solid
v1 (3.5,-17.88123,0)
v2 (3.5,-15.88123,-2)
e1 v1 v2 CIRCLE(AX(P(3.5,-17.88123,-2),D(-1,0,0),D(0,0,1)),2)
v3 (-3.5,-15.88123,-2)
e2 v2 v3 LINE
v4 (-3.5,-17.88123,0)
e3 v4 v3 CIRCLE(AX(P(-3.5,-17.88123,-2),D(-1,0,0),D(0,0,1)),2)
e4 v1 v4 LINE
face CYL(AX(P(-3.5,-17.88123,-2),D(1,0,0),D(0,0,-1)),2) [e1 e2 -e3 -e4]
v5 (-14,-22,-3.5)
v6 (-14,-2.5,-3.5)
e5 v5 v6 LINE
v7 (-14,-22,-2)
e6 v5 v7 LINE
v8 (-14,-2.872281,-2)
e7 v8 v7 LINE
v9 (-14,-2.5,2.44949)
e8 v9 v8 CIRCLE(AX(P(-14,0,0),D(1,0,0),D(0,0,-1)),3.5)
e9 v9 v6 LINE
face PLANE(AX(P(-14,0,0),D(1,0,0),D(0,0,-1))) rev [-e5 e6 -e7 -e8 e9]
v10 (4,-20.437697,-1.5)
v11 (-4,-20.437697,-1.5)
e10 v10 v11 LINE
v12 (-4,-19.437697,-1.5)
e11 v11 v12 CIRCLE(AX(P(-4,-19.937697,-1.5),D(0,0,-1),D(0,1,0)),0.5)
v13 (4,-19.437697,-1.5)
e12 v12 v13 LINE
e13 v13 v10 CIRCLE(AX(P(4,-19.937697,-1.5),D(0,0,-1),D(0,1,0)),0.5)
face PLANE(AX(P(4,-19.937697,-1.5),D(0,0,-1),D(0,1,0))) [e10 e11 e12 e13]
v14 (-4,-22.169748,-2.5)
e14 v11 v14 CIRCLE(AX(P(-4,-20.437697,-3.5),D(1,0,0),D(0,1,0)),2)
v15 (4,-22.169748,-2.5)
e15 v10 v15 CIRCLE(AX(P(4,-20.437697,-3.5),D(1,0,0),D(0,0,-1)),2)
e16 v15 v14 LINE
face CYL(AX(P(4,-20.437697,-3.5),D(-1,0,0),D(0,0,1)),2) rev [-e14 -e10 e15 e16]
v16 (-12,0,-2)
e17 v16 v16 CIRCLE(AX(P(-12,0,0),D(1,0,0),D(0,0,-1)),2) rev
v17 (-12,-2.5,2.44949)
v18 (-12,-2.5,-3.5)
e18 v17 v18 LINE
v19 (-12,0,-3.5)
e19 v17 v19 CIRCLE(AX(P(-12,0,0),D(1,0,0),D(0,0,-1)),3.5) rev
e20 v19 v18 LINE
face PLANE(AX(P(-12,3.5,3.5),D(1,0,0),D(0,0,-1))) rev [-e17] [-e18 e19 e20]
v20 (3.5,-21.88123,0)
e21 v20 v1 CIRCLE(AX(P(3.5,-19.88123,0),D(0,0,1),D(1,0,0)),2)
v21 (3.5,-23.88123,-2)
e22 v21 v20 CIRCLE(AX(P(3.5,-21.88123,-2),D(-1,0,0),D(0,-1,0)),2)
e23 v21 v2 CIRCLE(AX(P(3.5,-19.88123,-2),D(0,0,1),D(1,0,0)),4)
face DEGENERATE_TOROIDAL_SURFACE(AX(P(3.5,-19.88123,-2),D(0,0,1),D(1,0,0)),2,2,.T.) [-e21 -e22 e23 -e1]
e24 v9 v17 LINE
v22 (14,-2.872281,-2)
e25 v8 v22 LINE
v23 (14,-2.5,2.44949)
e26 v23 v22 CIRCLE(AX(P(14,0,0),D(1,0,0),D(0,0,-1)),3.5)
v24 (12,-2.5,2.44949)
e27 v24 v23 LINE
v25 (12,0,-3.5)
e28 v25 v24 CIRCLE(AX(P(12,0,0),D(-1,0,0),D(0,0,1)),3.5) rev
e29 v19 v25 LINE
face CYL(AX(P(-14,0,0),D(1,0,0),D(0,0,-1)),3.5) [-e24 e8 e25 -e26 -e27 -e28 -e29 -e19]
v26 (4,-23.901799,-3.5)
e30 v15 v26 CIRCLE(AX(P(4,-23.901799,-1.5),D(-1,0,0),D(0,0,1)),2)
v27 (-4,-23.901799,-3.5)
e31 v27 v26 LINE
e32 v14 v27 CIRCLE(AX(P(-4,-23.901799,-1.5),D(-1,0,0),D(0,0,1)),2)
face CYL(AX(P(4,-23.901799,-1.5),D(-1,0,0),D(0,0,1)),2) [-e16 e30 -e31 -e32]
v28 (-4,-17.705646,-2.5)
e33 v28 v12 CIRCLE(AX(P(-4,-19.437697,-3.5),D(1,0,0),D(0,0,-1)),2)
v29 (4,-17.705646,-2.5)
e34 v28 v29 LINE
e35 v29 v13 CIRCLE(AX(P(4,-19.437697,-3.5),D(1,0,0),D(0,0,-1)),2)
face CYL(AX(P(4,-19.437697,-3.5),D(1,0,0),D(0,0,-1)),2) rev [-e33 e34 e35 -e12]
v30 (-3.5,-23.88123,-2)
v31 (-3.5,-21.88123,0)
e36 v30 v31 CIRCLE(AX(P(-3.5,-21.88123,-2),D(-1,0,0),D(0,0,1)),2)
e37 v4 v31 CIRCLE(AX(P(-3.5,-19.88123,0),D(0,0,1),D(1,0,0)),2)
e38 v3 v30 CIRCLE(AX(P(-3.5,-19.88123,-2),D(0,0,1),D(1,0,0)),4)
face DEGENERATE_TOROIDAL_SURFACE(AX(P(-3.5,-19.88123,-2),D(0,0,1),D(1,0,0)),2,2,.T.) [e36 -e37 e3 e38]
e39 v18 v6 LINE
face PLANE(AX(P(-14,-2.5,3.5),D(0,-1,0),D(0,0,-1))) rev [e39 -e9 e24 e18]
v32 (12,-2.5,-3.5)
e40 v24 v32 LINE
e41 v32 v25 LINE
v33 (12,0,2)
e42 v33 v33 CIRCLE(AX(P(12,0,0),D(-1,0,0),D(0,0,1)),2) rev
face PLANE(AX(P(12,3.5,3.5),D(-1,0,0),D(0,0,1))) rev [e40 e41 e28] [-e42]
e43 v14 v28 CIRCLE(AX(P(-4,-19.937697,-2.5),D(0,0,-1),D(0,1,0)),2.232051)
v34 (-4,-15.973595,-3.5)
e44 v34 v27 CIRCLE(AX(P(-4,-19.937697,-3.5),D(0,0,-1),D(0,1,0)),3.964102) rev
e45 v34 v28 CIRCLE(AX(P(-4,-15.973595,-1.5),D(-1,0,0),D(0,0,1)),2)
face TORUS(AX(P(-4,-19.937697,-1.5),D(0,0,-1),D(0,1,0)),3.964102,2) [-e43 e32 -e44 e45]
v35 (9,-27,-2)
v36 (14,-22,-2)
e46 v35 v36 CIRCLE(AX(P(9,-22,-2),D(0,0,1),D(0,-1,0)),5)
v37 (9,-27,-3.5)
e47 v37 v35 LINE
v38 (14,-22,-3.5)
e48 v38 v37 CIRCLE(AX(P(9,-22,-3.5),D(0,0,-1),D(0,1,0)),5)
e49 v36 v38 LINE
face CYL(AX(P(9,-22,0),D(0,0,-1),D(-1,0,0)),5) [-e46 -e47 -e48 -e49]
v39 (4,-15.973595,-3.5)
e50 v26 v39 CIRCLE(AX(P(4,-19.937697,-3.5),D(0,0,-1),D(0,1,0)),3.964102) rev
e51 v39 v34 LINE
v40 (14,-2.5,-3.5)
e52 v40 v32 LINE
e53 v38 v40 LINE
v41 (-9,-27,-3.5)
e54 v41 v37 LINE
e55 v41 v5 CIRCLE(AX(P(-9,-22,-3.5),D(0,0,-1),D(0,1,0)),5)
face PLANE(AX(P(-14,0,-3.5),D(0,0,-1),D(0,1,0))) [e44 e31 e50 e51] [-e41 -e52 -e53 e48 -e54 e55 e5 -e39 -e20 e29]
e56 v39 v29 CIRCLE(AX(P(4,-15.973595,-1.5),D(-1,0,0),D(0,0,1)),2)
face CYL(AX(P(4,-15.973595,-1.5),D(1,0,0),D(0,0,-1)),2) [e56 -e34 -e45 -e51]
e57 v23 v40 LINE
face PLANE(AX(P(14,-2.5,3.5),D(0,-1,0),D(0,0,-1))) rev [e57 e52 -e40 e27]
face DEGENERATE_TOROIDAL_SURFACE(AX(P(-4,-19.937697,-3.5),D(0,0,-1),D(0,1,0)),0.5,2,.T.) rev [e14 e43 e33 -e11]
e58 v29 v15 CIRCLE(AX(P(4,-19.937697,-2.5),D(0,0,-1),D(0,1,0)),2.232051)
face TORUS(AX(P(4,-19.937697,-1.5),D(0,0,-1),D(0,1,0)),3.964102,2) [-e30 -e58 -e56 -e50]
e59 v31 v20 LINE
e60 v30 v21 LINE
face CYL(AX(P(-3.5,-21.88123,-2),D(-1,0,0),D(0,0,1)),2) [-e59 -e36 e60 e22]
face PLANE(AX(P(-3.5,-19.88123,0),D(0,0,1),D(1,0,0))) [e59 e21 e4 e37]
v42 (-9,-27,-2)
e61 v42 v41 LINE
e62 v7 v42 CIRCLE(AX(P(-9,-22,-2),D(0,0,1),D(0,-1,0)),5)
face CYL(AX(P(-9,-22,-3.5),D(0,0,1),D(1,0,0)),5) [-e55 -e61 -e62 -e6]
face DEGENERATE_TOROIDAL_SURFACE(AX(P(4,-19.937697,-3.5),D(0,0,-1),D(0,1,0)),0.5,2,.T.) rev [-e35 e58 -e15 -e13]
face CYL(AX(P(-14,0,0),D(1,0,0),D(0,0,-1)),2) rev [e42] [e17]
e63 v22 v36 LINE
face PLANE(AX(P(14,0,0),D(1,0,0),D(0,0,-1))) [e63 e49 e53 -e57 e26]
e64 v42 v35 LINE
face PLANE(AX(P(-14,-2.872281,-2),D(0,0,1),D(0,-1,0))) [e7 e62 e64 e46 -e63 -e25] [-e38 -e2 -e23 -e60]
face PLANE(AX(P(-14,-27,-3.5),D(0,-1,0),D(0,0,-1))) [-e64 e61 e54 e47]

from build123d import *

# Parameters (mm, degrees)
BOSS_EXTRUDE1_DEPTH      = 14
BOSS_EXTRUDE1_DEPTH_BACK = 14
SKETCH1_R                = 2
FILLET1_R                = 5
BOSS_EXTRUDE2_DEPTH      = 2
FILLET2_R                = 2
CUT_EXTRUDE1_DEPTH       = 2
FILLET3_R                = 2
FILLET4_R                = 2
SKETCH4_W                = 2
SKETCH4_H                = 6
CUT_EXTRUDE2_DEPTH       = 32.208973069


# Some blends are built 0.0001 mm under size
with BuildPart() as part:
    # Sketch1 → Boss-Extrude1 (new, two sides: drawn at the far end of the back side and taken through both)
    with BuildSketch(Plane(origin=(0, 0, 0), x_dir=(0, 0, -1), z_dir=(1, 0, 0)).offset(-BOSS_EXTRUDE1_DEPTH_BACK)):
        with BuildLine():
            Line((3.5, 0), (3.5, -27))
            Line((3.5, -27), (2, -27))
            Line((2, -27), (2, -2.872281323))
            ThreePointArc((2, -2.872281323), (-3.102418411, 1.620185175), (3.5, 0))
        make_face()
        Circle(SKETCH1_R, mode=Mode.SUBTRACT)
    extrude(amount=BOSS_EXTRUDE1_DEPTH + BOSS_EXTRUDE1_DEPTH_BACK)

    # Fillet1
    fillet1_edges = [part.edges().sort_by_distance(p)[0] for p in [
        (-14, -27, -2.75),
        (14, -27, -2.75),
    ]]
    fillet(fillet1_edges, radius=FILLET1_R)

    # Sketch2 → Boss-Extrude2 (add)
    with BuildSketch(Plane.XY.offset(-2)):
        with BuildLine():
            Line((-3.5, -15.881230087), (3.5, -15.881230087))
            ThreePointArc((3.5, -15.881230087), (7.5, -19.881230087), (3.5, -23.881230087))
            Line((3.5, -23.881230087), (-3.5, -23.881230087))
            ThreePointArc((-3.5, -23.881230087), (-7.5, -19.881230087), (-3.5, -15.881230087))
        make_face()
    extrude(amount=BOSS_EXTRUDE2_DEPTH)

    # Fillet2
    fillet2_edges = [part.edges().sort_by_distance(p)[0] for p in [
        (-7.5, -19.881230087, 0),
        (0, -15.881230087, 0),
        (7.5, -19.881230087, 0),
        (0, -23.881230087, 0),
    ]]
    fillet(fillet2_edges, radius=FILLET2_R - 0.0001)  # a hair under: the kernel refuses the full size

    # Sketch3 → Cut-Extrude1 (cut)
    with BuildSketch(Plane(origin=(0, 0, -3.5), x_dir=(-1, 0, 0), z_dir=(0, 0, -1))):
        with BuildLine():
            Line((-4, -17.437696963), (4, -17.437696963))
            ThreePointArc((4, -17.437696963), (6.5, -19.937696963), (4, -22.437696963))
            Line((4, -22.437696963), (-4, -22.437696963))
            ThreePointArc((-4, -22.437696963), (-6.5, -19.937696963), (-4, -17.437696963))
        make_face()
    extrude(amount=-CUT_EXTRUDE1_DEPTH, mode=Mode.SUBTRACT)

    # Fillet3
    fillet3_edges = [part.edges().sort_by_distance(p)[0] for p in [
        (-6.5, -19.937696963, -1.5),
        (0, -22.437696963, -1.5),
        (6.5, -19.937696963, -1.5),
        (0, -17.437696963, -1.5),
    ]]
    fillet(fillet3_edges, radius=FILLET3_R - 0.0001)  # a hair under: the kernel refuses the full size

    # Fillet4
    # the kernel refuses this fillet: 2 mm, written as the material it takes off along each edge
    with BuildSketch(Plane(origin=(4, -19.937696963, -3.5), x_dir=(0, -1, 0), z_dir=(-1, 0, 0))) as fillet4_piece_1:
        with BuildLine():
            CenterArc((3.96414388, 2), FILLET4_R, 209.999172989, 60.000827011)
            Line((3.96414388, 0), (3.96414388, -0.2))
            Line((3.96414388, -0.2), (2.5, -0.2))
            Line((2.5, -0.2), (2.3, 0))
            ThreePointArc((2.3, 0), (2.3, 0.0001), (2.058872114, 0.900027501))
            Line((2.058872114, 0.900027501), (2.232078638, 1.000025001))
        make_face()
    revolve(axis=Axis((4, -19.937696963, -3.5), (0, 0, 1)), revolution_arc=180, mode=Mode.SUBTRACT)
    with BuildSketch(Plane(origin=(-4, -22.437696963, -3.5), x_dir=(0, 0.2587879267537998, 0.9659341638882383), z_dir=(1, 0, 0))) as fillet4_piece_2:
        with BuildLine():
            CenterArc((1.552965569, 1.931842448), FILLET4_R, 194.998154162, 60.000827011)
            Line((-0.378902759, 1.414266594), (-0.572089592, 1.362509009))
            Line((-0.572089592, 1.362509009), (-0.193186833, -0.051757585))
            Line((-0.193186833, -0.051757585), (0.051757585, -0.193186833))
            ThreePointArc((0.051757585, -0.193186833), (0.051854179, -0.193160954), (0.983525882, -0.193184245))
            Line((0.983525882, -0.193184245), (1.035293127, 0))
        make_face()
    extrude(amount=8, mode=Mode.SUBTRACT)
    with BuildSketch(Plane(origin=(-4, -19.937696963, -3.5), x_dir=(0, 1, 0), z_dir=(1, 0, 0))) as fillet4_piece_3:
        with BuildLine():
            CenterArc((3.96414388, 2), FILLET4_R, 209.999172989, 60.000827011)
            Line((2.232078638, 1.000025001), (2.058872114, 0.900027501))
            ThreePointArc((2.058872114, 0.900027501), (2.3, 0.0001), (2.3, 0))
            Line((2.3, 0), (2.5, -0.2))
            Line((2.5, -0.2), (3.96414388, -0.2))
            Line((3.96414388, -0.2), (3.96414388, 0))
        make_face()
    revolve(axis=Axis((-4, -19.937696963, -3.5), (0, 0, 1)), revolution_arc=180, mode=Mode.SUBTRACT)
    with BuildSketch(Plane(origin=(4, -17.437696963, -3.5), x_dir=(0, 1, 0), z_dir=(-1, 0, 0))) as fillet4_piece_4:
        with BuildLine():
            CenterArc((1.46414388, -2), FILLET4_R, 90, 60.000827011)
            Line((-0.267921362, -1.000025001), (-0.441127886, -0.900027501))
            ThreePointArc((-0.441127886, -0.900027501), (-0.2, -0.0001), (-0.2, 0))
            Line((-0.2, 0), (0, 0.2))
            Line((0, 0.2), (1.46414388, 0.2))
            Line((1.46414388, 0.2), (1.46414388, 0))
        make_face()
    extrude(amount=8, mode=Mode.SUBTRACT)

    # Sketch4 → Cut-Extrude2 (cut, through all)
    with BuildSketch(Plane(origin=(0, 0, -3.5), x_dir=(-1, 0, 0), z_dir=(0, 0, -1))):
        with Locations((-13, 0.5)):
            Rectangle(SKETCH4_W, SKETCH4_H)
        with Locations((13, 0.5)):
            Rectangle(SKETCH4_W, SKETCH4_H)
    extrude(amount=-CUT_EXTRUDE2_DEPTH, mode=Mode.SUBTRACT)


solid = part.part
